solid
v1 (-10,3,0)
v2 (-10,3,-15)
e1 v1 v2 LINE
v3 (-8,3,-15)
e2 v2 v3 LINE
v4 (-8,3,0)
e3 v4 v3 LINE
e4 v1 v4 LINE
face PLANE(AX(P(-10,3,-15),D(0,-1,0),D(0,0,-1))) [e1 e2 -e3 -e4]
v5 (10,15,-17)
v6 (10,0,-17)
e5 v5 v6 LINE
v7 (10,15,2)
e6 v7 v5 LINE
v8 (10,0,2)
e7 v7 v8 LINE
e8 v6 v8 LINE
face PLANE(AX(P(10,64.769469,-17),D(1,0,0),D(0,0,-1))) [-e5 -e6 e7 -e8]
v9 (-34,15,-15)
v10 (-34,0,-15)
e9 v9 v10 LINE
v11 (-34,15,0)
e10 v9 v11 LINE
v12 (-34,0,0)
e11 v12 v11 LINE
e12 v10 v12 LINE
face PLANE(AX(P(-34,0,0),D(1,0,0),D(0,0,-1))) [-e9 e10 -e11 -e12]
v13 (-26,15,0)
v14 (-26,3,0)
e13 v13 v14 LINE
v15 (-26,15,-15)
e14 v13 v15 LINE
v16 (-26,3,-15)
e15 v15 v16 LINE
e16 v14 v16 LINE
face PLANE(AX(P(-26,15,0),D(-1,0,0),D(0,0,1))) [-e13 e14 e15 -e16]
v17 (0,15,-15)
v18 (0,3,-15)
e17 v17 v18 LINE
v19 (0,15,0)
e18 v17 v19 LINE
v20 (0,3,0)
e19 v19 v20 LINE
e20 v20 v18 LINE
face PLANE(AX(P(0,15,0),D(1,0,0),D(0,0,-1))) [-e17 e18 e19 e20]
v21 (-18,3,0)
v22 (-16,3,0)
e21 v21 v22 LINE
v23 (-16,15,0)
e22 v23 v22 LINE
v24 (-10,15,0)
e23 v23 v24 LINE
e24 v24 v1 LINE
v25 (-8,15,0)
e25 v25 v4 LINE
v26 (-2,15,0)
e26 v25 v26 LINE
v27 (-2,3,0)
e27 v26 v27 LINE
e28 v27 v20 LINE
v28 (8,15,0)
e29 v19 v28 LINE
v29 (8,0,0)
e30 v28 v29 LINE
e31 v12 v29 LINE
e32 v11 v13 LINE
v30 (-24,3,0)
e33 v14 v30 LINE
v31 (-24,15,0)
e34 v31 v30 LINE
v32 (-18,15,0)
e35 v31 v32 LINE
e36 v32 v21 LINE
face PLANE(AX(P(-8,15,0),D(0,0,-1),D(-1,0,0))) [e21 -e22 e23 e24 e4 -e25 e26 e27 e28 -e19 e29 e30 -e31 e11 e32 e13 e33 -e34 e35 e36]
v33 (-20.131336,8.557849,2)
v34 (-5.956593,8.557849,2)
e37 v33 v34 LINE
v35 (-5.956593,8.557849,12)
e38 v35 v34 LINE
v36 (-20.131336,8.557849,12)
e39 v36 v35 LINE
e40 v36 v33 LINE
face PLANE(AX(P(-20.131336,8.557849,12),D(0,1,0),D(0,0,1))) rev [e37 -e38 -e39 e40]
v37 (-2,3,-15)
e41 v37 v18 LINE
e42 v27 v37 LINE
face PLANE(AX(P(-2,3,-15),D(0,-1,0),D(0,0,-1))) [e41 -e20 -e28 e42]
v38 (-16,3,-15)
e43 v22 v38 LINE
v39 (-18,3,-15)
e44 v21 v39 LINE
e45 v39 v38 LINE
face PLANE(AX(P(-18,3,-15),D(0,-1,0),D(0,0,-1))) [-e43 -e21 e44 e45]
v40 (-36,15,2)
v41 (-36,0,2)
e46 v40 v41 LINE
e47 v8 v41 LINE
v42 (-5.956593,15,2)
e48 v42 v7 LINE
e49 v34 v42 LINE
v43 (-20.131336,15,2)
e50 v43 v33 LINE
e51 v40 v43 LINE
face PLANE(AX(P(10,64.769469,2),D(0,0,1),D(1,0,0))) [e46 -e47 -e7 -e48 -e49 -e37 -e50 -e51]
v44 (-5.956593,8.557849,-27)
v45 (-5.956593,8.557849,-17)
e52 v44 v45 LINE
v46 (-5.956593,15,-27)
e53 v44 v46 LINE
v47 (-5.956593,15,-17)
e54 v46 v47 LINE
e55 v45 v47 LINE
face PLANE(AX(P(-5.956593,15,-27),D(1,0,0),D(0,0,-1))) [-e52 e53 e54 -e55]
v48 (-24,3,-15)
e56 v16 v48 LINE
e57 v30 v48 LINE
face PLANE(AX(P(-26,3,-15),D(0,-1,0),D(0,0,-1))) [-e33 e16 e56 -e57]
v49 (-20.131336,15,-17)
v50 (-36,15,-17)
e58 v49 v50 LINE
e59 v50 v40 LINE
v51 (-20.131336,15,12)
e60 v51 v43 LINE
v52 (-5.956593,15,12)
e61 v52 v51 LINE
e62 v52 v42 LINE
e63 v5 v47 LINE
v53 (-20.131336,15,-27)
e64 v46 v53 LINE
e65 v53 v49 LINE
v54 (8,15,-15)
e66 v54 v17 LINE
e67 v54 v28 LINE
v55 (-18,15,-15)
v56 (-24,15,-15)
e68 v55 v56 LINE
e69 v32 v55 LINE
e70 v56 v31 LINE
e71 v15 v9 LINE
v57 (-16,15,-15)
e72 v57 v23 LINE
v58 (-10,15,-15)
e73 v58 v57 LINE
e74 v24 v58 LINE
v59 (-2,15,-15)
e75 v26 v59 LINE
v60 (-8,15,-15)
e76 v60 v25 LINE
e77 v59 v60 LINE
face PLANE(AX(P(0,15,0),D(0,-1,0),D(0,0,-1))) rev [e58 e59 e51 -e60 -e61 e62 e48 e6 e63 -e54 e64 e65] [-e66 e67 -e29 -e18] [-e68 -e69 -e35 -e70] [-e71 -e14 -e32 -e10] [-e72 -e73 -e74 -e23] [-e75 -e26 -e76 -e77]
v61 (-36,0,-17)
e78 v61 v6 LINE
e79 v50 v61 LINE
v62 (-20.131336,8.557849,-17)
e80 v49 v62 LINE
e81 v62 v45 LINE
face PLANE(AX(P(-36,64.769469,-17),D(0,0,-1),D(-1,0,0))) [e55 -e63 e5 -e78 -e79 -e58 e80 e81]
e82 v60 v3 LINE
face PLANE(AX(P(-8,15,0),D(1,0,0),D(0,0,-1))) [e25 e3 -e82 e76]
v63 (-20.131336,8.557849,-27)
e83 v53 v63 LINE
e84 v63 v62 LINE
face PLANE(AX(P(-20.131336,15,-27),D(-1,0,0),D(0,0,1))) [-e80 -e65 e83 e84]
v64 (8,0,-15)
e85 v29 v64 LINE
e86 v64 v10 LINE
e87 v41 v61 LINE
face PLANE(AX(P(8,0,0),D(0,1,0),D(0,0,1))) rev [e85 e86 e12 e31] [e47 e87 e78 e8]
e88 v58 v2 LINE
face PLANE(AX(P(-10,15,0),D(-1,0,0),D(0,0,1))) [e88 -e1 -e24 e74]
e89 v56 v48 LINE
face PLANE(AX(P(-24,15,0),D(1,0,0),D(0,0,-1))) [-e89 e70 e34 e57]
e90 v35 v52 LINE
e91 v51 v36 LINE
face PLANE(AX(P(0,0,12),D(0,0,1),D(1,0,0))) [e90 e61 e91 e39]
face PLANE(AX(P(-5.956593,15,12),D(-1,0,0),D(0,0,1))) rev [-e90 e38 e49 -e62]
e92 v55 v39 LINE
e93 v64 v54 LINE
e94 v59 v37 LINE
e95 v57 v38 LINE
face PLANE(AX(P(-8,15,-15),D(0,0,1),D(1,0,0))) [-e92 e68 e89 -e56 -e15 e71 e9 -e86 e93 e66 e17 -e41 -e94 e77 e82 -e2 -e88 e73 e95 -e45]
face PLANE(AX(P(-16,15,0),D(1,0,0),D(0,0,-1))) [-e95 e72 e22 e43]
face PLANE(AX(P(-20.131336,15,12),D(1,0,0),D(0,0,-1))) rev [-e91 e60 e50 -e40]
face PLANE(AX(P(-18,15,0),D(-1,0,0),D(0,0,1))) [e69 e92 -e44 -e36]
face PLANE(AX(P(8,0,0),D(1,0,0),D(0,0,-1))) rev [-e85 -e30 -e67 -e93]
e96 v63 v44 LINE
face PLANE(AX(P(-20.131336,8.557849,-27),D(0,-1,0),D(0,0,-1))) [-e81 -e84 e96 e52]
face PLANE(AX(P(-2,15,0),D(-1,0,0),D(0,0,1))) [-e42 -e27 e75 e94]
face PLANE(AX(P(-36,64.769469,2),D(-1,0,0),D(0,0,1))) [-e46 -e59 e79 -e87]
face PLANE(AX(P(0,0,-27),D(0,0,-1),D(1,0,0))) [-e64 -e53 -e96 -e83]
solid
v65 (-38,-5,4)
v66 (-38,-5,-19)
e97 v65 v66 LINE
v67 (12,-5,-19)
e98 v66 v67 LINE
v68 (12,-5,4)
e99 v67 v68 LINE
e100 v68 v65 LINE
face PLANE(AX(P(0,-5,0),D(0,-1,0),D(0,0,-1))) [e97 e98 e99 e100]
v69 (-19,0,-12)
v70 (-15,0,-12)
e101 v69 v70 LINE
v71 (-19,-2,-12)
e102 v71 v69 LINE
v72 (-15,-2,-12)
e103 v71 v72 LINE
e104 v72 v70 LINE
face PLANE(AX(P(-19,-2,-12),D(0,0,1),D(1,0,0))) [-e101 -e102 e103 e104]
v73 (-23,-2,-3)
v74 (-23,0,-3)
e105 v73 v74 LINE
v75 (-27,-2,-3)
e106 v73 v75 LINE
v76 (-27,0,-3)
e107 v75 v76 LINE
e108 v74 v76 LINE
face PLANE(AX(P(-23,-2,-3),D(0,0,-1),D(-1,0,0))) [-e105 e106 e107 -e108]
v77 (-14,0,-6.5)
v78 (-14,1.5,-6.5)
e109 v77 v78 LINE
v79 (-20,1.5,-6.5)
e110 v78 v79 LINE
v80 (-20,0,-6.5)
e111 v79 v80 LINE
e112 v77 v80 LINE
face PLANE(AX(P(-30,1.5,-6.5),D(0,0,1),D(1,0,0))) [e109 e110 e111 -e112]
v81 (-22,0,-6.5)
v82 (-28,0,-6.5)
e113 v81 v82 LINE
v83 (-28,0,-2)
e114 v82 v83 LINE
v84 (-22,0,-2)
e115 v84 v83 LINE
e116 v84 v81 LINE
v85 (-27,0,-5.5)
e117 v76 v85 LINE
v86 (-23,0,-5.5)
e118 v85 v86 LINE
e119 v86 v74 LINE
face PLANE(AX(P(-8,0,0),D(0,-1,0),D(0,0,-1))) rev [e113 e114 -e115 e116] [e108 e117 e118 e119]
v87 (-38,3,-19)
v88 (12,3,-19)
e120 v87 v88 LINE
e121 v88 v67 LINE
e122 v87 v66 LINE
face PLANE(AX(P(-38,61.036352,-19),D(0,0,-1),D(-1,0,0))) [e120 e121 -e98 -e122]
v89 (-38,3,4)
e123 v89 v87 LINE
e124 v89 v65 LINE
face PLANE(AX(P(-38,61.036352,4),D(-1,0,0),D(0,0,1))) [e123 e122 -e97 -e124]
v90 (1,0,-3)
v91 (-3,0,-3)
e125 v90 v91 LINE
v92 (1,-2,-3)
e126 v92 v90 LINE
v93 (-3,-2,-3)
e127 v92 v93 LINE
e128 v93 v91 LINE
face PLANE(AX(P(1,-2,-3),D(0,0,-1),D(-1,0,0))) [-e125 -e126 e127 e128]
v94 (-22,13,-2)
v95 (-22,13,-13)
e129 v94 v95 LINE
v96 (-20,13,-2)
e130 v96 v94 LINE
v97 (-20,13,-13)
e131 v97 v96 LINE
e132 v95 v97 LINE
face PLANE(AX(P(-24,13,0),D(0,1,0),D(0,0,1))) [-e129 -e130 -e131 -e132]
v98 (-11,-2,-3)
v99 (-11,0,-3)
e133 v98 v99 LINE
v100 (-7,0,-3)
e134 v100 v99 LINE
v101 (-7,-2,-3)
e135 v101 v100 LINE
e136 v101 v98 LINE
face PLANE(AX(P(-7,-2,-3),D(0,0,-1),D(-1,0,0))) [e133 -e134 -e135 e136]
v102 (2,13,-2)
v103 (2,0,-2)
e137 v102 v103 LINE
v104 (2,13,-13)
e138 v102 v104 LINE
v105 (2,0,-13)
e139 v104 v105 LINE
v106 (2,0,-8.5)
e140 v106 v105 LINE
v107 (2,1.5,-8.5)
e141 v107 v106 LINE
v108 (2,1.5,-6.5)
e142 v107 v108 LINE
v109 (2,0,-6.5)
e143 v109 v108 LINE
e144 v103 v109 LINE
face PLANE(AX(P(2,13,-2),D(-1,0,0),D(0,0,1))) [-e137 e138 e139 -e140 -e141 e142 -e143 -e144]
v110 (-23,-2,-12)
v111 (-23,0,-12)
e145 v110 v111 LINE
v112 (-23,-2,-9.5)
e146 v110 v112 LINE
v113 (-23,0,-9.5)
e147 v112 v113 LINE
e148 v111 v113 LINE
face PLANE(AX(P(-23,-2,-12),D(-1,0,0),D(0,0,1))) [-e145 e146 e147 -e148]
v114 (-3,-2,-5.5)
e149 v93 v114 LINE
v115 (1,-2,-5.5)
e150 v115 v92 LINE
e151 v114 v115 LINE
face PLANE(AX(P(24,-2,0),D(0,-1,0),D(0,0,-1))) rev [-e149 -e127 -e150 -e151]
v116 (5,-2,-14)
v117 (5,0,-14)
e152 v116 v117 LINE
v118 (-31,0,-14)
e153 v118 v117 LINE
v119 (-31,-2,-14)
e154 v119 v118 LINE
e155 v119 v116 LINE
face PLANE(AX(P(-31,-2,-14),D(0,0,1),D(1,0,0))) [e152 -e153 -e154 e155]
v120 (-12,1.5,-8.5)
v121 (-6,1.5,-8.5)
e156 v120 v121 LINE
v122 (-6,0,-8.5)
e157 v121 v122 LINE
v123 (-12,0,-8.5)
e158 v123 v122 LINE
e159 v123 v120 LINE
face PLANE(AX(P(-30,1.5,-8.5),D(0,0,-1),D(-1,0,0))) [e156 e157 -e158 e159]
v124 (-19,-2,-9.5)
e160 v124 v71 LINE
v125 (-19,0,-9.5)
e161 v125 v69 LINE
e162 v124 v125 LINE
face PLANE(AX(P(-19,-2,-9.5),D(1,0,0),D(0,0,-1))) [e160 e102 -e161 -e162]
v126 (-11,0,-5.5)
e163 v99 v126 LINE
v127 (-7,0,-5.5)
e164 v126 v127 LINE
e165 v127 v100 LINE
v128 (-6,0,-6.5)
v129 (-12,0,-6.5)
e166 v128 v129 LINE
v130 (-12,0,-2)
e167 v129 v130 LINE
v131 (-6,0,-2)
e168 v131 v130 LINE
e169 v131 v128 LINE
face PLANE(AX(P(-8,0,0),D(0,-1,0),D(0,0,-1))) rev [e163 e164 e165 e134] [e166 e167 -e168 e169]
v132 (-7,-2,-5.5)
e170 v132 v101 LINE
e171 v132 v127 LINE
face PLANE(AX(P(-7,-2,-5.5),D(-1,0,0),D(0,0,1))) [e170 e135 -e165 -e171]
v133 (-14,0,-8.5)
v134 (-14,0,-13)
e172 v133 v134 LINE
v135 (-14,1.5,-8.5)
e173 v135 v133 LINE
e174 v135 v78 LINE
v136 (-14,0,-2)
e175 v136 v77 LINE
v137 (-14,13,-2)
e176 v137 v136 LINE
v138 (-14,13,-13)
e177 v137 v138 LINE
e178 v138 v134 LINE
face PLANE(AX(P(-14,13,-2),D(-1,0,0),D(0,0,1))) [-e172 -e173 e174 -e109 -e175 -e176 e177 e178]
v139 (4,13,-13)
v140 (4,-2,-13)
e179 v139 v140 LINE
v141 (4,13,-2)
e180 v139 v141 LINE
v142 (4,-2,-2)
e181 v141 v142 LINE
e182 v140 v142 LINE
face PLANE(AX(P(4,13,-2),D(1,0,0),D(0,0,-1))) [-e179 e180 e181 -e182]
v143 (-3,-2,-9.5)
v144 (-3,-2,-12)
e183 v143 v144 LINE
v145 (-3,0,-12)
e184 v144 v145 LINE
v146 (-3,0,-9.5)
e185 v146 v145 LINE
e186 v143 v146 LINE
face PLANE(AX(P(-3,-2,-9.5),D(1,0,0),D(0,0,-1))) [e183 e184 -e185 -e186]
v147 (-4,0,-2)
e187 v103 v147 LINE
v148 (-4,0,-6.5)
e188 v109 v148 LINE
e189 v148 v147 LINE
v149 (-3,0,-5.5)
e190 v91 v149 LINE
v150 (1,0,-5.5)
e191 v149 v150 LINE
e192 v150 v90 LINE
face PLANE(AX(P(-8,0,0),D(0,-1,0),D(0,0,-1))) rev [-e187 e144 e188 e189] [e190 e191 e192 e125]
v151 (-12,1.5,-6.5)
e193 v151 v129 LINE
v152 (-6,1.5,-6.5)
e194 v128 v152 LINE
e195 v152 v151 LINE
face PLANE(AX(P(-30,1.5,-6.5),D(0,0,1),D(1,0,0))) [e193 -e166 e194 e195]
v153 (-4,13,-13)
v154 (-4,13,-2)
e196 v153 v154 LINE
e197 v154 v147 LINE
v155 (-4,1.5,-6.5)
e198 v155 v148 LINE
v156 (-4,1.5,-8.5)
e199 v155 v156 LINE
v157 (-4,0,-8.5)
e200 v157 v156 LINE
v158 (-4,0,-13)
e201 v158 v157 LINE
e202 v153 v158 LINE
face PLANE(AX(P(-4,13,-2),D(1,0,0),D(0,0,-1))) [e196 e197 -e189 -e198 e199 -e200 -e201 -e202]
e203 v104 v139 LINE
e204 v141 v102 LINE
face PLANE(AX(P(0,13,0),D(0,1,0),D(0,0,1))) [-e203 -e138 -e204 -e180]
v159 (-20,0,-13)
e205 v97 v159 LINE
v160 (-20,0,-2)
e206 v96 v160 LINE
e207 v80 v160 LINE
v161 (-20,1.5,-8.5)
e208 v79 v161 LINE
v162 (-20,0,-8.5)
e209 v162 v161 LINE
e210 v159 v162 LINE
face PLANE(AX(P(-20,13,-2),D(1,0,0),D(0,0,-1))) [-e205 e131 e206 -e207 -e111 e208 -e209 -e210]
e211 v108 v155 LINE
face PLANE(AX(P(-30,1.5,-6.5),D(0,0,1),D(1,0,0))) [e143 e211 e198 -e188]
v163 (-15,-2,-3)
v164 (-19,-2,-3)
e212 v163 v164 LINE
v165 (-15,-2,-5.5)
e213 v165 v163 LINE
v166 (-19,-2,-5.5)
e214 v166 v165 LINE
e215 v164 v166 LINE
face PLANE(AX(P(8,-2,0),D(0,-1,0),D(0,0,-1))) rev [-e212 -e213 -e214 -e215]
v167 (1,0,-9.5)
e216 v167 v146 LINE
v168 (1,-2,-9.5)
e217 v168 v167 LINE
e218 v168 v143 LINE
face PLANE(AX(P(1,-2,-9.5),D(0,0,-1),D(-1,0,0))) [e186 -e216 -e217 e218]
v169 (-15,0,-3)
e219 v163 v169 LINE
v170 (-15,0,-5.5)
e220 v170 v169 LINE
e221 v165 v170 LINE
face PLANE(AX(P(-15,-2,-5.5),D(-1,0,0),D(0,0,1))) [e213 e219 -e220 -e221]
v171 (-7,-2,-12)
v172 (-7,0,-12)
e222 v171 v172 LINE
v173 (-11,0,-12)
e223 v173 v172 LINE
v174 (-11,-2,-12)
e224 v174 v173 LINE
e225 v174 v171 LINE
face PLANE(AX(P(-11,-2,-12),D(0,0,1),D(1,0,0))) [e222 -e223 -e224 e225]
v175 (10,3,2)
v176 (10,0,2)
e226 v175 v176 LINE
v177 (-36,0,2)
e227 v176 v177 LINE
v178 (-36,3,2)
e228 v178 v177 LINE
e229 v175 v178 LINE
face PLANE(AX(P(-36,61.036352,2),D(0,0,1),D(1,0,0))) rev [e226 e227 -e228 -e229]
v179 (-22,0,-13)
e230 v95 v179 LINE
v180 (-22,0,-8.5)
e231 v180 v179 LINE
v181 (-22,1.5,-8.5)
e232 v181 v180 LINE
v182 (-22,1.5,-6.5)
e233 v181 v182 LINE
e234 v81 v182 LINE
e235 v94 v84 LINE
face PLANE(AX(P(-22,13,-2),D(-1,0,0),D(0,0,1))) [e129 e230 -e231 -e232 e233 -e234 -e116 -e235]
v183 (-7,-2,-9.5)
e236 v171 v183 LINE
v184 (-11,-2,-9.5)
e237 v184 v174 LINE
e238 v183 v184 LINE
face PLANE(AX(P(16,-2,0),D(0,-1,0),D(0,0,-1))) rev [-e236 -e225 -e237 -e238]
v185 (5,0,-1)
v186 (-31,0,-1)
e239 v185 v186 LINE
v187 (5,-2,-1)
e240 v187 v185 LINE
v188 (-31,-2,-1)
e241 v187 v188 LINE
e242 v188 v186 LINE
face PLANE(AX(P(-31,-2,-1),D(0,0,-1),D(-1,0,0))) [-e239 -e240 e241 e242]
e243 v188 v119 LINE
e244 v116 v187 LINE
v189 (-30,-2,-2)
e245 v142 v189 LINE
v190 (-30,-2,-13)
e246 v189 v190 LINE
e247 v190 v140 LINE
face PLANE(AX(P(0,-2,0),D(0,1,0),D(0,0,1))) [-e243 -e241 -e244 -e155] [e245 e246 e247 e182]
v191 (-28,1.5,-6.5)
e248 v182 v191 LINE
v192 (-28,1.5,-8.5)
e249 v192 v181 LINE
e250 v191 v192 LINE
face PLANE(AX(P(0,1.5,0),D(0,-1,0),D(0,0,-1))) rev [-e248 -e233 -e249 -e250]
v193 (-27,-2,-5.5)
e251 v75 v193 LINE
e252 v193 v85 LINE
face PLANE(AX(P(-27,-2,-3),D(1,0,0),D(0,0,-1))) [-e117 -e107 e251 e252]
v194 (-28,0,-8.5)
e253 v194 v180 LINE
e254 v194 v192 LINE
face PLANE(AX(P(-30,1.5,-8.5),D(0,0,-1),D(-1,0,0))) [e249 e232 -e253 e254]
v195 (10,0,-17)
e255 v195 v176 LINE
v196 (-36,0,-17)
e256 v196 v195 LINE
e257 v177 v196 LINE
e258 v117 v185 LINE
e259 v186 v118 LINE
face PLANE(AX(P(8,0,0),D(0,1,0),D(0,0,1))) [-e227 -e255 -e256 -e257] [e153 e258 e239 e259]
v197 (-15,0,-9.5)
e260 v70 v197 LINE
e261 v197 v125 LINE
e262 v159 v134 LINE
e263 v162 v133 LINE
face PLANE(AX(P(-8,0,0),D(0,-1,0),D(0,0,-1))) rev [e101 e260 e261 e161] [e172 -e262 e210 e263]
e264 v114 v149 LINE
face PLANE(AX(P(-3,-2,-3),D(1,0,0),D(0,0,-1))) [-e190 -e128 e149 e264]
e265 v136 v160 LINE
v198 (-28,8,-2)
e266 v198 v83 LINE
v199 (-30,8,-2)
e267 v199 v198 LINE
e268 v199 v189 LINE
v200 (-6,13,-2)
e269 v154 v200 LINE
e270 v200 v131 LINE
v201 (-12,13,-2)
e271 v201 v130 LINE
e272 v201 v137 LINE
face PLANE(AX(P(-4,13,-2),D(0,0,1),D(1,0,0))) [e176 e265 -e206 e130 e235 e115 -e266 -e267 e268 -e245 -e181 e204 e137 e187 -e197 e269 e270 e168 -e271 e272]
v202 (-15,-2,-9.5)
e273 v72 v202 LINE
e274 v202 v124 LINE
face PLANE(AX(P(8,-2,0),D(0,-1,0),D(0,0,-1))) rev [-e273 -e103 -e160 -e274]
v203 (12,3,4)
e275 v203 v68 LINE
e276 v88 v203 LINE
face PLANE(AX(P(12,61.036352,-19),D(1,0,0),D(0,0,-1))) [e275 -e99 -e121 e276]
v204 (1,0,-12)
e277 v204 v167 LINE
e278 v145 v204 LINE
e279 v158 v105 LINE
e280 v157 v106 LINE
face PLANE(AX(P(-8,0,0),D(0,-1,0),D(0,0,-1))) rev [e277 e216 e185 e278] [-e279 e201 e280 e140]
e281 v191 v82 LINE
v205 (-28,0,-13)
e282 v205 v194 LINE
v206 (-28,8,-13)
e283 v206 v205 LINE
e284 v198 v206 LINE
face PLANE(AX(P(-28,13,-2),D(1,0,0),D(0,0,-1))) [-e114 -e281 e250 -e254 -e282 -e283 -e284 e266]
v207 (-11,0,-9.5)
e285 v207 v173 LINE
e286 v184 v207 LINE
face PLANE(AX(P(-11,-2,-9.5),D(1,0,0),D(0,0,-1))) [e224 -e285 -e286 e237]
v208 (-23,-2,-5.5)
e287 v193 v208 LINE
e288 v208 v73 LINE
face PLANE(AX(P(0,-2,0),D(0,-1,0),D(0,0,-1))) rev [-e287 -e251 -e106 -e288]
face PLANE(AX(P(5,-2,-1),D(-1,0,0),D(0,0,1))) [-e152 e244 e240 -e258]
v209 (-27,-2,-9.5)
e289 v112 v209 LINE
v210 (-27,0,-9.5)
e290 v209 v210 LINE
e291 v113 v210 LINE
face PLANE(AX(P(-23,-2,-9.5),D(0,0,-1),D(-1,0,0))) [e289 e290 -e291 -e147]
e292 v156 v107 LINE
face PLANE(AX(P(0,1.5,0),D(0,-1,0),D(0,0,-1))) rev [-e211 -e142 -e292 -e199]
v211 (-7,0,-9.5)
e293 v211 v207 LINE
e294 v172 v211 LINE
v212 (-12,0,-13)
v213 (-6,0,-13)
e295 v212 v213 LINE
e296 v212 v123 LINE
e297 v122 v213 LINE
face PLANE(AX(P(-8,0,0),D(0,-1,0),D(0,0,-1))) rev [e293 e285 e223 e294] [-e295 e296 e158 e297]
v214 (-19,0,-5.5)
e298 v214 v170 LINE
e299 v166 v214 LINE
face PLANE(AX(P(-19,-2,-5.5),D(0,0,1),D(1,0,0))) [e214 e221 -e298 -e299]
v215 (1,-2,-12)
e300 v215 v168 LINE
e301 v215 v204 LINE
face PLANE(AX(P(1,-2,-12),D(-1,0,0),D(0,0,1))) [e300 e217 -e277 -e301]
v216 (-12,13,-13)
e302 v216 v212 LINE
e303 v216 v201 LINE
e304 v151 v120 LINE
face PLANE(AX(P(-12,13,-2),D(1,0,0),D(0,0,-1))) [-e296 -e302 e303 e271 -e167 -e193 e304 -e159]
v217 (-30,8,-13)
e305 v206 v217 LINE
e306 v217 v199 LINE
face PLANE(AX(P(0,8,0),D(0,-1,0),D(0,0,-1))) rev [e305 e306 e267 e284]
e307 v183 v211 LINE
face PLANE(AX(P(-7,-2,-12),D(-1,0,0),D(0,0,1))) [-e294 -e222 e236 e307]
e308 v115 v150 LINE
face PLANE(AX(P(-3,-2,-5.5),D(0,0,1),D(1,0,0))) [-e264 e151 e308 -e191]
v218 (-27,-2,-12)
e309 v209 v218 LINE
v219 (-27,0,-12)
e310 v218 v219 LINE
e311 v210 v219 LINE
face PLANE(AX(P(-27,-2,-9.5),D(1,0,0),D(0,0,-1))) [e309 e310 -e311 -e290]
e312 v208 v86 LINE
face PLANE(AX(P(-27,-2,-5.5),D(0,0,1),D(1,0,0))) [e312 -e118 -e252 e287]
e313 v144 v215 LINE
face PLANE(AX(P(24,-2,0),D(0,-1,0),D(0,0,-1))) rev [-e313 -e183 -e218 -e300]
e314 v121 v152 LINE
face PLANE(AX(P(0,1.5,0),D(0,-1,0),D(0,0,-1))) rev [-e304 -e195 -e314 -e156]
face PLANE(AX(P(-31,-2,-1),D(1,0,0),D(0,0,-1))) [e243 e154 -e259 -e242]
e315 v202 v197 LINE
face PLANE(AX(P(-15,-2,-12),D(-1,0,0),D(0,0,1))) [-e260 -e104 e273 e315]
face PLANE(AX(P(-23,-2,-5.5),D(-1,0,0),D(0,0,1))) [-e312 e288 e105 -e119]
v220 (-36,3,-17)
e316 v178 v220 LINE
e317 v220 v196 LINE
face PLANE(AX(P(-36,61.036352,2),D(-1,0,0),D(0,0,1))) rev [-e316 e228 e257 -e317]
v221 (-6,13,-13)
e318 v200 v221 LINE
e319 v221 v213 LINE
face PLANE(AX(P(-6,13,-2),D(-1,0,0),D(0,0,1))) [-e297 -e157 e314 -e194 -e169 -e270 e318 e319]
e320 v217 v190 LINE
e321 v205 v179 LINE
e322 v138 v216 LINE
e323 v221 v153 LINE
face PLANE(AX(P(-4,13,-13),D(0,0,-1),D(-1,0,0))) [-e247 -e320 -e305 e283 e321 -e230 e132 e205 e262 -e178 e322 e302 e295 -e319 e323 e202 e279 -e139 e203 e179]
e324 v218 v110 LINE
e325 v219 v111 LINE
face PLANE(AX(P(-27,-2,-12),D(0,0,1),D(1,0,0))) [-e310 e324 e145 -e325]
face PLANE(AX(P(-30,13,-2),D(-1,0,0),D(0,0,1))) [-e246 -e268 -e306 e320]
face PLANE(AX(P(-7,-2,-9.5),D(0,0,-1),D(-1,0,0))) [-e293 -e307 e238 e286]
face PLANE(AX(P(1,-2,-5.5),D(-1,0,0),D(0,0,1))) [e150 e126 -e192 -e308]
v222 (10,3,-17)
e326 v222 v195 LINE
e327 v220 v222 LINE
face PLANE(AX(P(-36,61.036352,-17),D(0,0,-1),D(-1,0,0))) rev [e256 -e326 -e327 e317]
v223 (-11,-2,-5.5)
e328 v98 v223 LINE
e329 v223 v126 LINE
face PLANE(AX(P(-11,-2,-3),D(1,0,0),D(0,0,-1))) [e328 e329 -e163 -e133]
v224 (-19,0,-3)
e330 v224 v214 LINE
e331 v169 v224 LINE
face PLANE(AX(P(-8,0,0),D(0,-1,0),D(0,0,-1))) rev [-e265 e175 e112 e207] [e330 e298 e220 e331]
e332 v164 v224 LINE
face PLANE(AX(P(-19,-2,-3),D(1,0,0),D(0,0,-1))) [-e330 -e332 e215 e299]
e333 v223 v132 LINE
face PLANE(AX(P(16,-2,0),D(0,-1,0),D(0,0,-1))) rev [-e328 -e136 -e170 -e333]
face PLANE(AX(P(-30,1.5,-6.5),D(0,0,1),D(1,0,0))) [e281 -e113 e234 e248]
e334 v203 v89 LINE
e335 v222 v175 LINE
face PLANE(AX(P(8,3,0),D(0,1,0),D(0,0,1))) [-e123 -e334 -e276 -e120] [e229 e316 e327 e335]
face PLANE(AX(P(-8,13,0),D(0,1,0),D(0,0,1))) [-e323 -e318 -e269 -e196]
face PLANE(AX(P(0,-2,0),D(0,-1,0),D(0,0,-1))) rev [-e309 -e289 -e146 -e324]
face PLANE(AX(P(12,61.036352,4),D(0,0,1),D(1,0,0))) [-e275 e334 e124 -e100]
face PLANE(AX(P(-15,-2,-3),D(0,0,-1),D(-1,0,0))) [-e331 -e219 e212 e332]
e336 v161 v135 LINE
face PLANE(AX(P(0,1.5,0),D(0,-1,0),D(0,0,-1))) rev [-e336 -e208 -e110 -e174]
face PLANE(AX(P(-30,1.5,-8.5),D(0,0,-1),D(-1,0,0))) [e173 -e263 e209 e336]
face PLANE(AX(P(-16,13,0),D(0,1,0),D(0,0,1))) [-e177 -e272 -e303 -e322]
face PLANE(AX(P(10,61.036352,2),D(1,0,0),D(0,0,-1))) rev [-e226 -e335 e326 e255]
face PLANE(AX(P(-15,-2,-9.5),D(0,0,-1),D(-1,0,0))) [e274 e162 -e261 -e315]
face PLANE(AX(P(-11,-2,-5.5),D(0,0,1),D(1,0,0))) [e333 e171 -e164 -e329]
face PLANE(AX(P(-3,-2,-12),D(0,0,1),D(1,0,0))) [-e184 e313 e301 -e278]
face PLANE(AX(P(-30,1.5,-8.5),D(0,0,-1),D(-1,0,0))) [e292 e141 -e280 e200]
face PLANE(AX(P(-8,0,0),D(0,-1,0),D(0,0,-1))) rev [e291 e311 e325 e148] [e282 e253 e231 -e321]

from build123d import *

# Parameters (mm, degrees)
SKETCH1_W                 = 6
SKETCH1_H                 = 15
BOSS_EXTRUDE1_DEPTH       = 15
SKETCH2_W                 = 2
SKETCH2_H                 = 11
CUT_EXTRUDE1_DEPTH        = 13
SKETCH3_W                 = 15
SKETCH3_H                 = 3
BOSS_EXTRUDE2_DEPTH       = 2
LPATTERN1_COUNT           = 5
LPATTERN1_PITCH           = 8
SKETCH6_W                 = 15
SKETCH6_H                 = 15
BOSS_EXTRUDE4_DEPTH       = 2
SKETCH8_W                 = 15
SKETCH8_H                 = 12
BOSS_EXTRUDE5_DEPTH       = 2
SKETCH9_W                 = 34
SKETCH9_H                 = 2
CUT_EXTRUDE2_DEPTH        = 1.5
SKETCH13_W                = 36
SKETCH13_H                = 13
SKETCH13_W_2              = 34
SKETCH13_H_2              = 11
BOSS_EXTRUDE9_DEPTH       = 2
SKETCH15_W                = 4
SKETCH15_H                = 2.5
BOSS_EXTRUDE10_DEPTH      = 2
LPATTERN2_COUNT           = 4
LPATTERN2_PITCH           = 8
BOSS_EXTRUDE11_DEPTH      = 5
BOSS_EXTRUDE11_DEPTH_BACK = 15
SKETCH17_W                = 46
SKETCH17_H                = 19
SPLIT2_START              = -5
SPLIT2_OUTLINE_W          = 46
SPLIT2_OUTLINE_H          = 19
SPLIT2_DEPTH              = 5
SPLIT2_2_OUTLINE_W        = 2
SPLIT2_2_OUTLINE_H        = 11
SPLIT2_2_DEPTH            = 13
SPLIT2_3_OUTLINE_W        = 6
SPLIT2_3_OUTLINE_H        = 2
SPLIT2_3_DEPTH            = 1.5
SPLIT2_START_2            = -13
SPLIT2_4_DEPTH            = 11
SPLIT2_START_3            = -17
SPLIT2_5_DEPTH            = 19
SPLIT2_6_OUTLINE_W        = 36
SPLIT2_6_OUTLINE_H        = 2
SPLIT2_6_DEPTH            = 3
SPLIT2_START_4            = -1
SPLIT2_7_OUTLINE_W        = 36
SPLIT2_7_OUTLINE_H        = 2
SPLIT2_7_DEPTH            = 3
SPLIT2_START_5            = -8.5
SPLIT2_8_DEPTH            = 2
SPLIT2_START_6            = -9.5
SPLIT2_9_OUTLINE_W        = 4
SPLIT2_9_OUTLINE_H        = 2
SPLIT2_9_DEPTH            = 4
SPLIT2_10_OUTLINE_W       = 4
SPLIT2_10_OUTLINE_H       = 2
SPLIT2_10_DEPTH           = 1
SPLIT2_START_7            = -3
SPLIT2_11_OUTLINE_W       = 4
SPLIT2_11_OUTLINE_H       = 2
SPLIT2_11_DEPTH           = 1
SKETCH18_W                = 14.174743238
SKETCH18_H                = 6.442150942
BOSS_EXTRUDE12_DEPTH      = 10
SKETCH19_W                = 50
SKETCH19_H                = 23
SKETCH19_W_2              = 46
SKETCH19_H_2              = 19
BOSS_EXTRUDE13_DEPTH      = 8
SKETCH20_W                = 2
SKETCH20_H                = 11
CUT_EXTRUDE3_DEPTH        = 5


# Read off the part's stored shape, not the designer's step: Split2
with BuildPart() as part:
    # Sketch1 → Boss-Extrude1 (new body)
    with BuildSketch(Plane(origin=(0, 0, 0), x_dir=(1, 0, 0), z_dir=(0, 1, 0))):
        with Locations((3, 7.5)):
            Rectangle(SKETCH1_W, SKETCH1_H)
    extrude(amount=BOSS_EXTRUDE1_DEPTH)

    # Sketch2 → Cut-Extrude1 (cut)
    with BuildSketch(Plane.XZ):
        with Locations((3, -7.5)):
            Rectangle(SKETCH2_W, SKETCH2_H)
    extrude(amount=-CUT_EXTRUDE1_DEPTH, mode=Mode.SUBTRACT)

    # Sketch3 → Boss-Extrude2 (add)
    with BuildSketch(Plane.ZY):
        with Locations((-7.5, 1.5)):
            Rectangle(SKETCH3_W, SKETCH3_H)
    extrude(amount=BOSS_EXTRUDE2_DEPTH)


with BuildPart() as lpattern1_1:
    # LPattern1: pattern copy
    add(part.part.moved(Location(Vector(-1, 0, 0) * (1 * LPATTERN1_PITCH))))


with BuildPart() as lpattern1_2:
    # LPattern1: pattern copy
    add(part.part.moved(Location(Vector(-1, 0, 0) * (2 * LPATTERN1_PITCH))))


with BuildPart() as lpattern1_3:
    # LPattern1: pattern copy
    add(part.part.moved(Location(Vector(-1, 0, 0) * (3 * LPATTERN1_PITCH))))


with BuildPart() as lpattern1_4:
    # LPattern1: pattern copy
    add(part.part.moved(Location(Vector(-1, 0, 0) * (4 * LPATTERN1_PITCH))))


with BuildPart() as lpattern1_1_1:
    add(lpattern1_1.part)

    # Combine1: union LPattern1_2, LPattern1_3, part, LPattern1_4
    add(lpattern1_2.part)
    add(lpattern1_3.part)
    add(part.part)
    add(lpattern1_4.part)

    # Sketch6 → Boss-Extrude4 (add)
    with BuildSketch(Plane(origin=(6, 0, 0), x_dir=(0, 0, -1), z_dir=(1, 0, 0))):
        with Locations((7.5, 7.5)):
            Rectangle(SKETCH6_W, SKETCH6_H)
    extrude(amount=BOSS_EXTRUDE4_DEPTH)

    # Sketch8 → Boss-Extrude5 (add)
    with BuildSketch(Plane.ZY.offset(32)):
        with Locations((-7.5, 9)):
            Rectangle(SKETCH8_W, SKETCH8_H)
    extrude(amount=BOSS_EXTRUDE5_DEPTH)

    # Sketch9 → Cut-Extrude2 (cut)
    with BuildSketch(Plane.XZ):
        with Locations((-13, -7.5)):
            Rectangle(SKETCH9_W, SKETCH9_H)
    extrude(amount=-CUT_EXTRUDE2_DEPTH, mode=Mode.SUBTRACT)

    # Sketch13 → Boss-Extrude9 (add)
    with BuildSketch(Plane(origin=(0, 0, 0), x_dir=(-1, 0, 0), z_dir=(0, -1, 0))):
        with Locations((13, 7.5)):
            Rectangle(SKETCH13_W, SKETCH13_H)
        with Locations((13, 7.5)):
            Rectangle(SKETCH13_W_2, SKETCH13_H_2, mode=Mode.SUBTRACT)
    extrude(amount=BOSS_EXTRUDE9_DEPTH)

    # Sketch15 → Boss-Extrude10 (add)
    with BuildSketch(Plane(origin=(0, 0, 0), x_dir=(-1, 0, 0), z_dir=(0, -1, 0))):
        with Locations((25, 4.25)):
            Rectangle(SKETCH15_W, SKETCH15_H)
        with Locations((25, 10.75)):
            Rectangle(SKETCH15_W, SKETCH15_H)
    boss_extrude10 = extrude(amount=BOSS_EXTRUDE10_DEPTH)

    # LPattern2: Boss-Extrude10 ×4
    with Locations(*[(i * LPATTERN2_PITCH, 0, 0) for i in range(1, LPATTERN2_COUNT)]):
        add(boss_extrude10)


with BuildPart() as body_2:
    # Sketch17 → Boss-Extrude11 (new, two sides: drawn at the far end of the back side and taken through both)
    with BuildSketch(Plane.XZ.offset(-BOSS_EXTRUDE11_DEPTH_BACK)):
        with Locations((-13, -7.5)):
            Rectangle(SKETCH17_W, SKETCH17_H)
    extrude(amount=BOSS_EXTRUDE11_DEPTH + BOSS_EXTRUDE11_DEPTH_BACK)

    # Combine3: cut LPattern1_1
    add(lpattern1_1_1.part, mode=Mode.SUBTRACT)

    # Split2 outline → Split2 (cut)
    with BuildSketch(Plane(origin=(0, 0, 0), x_dir=(1, 0, 0), z_dir=(0, 1, 0)).offset(SPLIT2_START)):
        with Locations((-13, 7.5)):
            Rectangle(SPLIT2_OUTLINE_W, SPLIT2_OUTLINE_H)
    extrude(amount=SPLIT2_DEPTH, mode=Mode.SUBTRACT)

    # Split2 2 outline → Split2 2 (cut)
    with BuildSketch(Plane(origin=(0, 0, 0), x_dir=(1, 0, 0), z_dir=(0, 1, 0))):
        with Locations((3, 7.5)):
            Rectangle(SPLIT2_2_OUTLINE_W, SPLIT2_2_OUTLINE_H)
        with Locations((-5, 7.5)):
            Rectangle(SPLIT2_2_OUTLINE_W, SPLIT2_2_OUTLINE_H)
        with Locations((-13, 7.5)):
            Rectangle(SPLIT2_2_OUTLINE_W, SPLIT2_2_OUTLINE_H)
        with Locations((-21, 7.5)):
            Rectangle(SPLIT2_2_OUTLINE_W, SPLIT2_2_OUTLINE_H)
        with Locations((-29, 7.5)):
            Rectangle(SPLIT2_2_OUTLINE_W, SPLIT2_2_OUTLINE_H)
    extrude(amount=SPLIT2_2_DEPTH, mode=Mode.SUBTRACT)

    # Split2 3 outline → Split2 3 (cut)
    with BuildSketch(Plane(origin=(0, 0, 0), x_dir=(1, 0, 0), z_dir=(0, 1, 0))):
        with Locations((-1, 7.5)):
            Rectangle(SPLIT2_3_OUTLINE_W, SPLIT2_3_OUTLINE_H)
        with Locations((-9, 7.5)):
            Rectangle(SPLIT2_3_OUTLINE_W, SPLIT2_3_OUTLINE_H)
        with Locations((-17, 7.5)):
            Rectangle(SPLIT2_3_OUTLINE_W, SPLIT2_3_OUTLINE_H)
        with Locations((-25, 7.5)):
            Rectangle(SPLIT2_3_OUTLINE_W, SPLIT2_3_OUTLINE_H)
    extrude(amount=SPLIT2_3_DEPTH, mode=Mode.SUBTRACT)

    # Sketch18 → Boss-Extrude12 (add)
    with BuildSketch(Plane.XY.offset(2)):
        with Locations((-13.043964225, 11.778924529)):
            Rectangle(SKETCH18_W, SKETCH18_H)
    boss_extrude12 = extrude(amount=BOSS_EXTRUDE12_DEPTH)

    # Mirror2: Boss-Extrude12 across plane
    add(boss_extrude12.mirror(Plane.XY.offset(-7.5)))


with BuildPart() as body_2_2:
    # Split2 4 outline → Split2 4 (new body)
    with BuildSketch(Plane.XY.offset(SPLIT2_START_2)):
        Polygon((-4, 0), (-4, 13), (-6, 13), (-6, 0), (-7, 0), (-7, -2), (-11, -2), (-11, 0), (-12, 0), (-12, 13), (-14, 13), (-14, 0), (-15, 0), (-15, -2), (-19, -2), (-19, 0), (-20, 0), (-20, 13), (-22, 13), (-22, 0), (-23, 0), (-23, -2), (-27, -2), (-27, 0), (-28, 0), (-28, 13), (-30, 13), (-30, -2), (-31, -2), (-31, 0), (-36, 0), (-36, -5), (10, -5), (10, 0), (5, 0), (5, -2), (4, -2), (4, 13), (2, 13), (2, 0), (1, 0), (1, -2), (-3, -2), (-3, 0), align=None)
    extrude(amount=SPLIT2_4_DEPTH)

    # Split2 5 outline → Split2 5 (add)
    with BuildSketch(Plane.XY.offset(SPLIT2_START_3)):
        Polygon((5, -2), (-31, -2), (-31, 0), (-36, 0), (-36, -5), (10, -5), (10, 0), (5, 0), align=None)
    extrude(amount=SPLIT2_5_DEPTH)

    # Split2 6 outline → Split2 6 (add)
    with BuildSketch(Plane.XY.offset(SPLIT2_START_3)):
        with Locations((-13, -1)):
            Rectangle(SPLIT2_6_OUTLINE_W, SPLIT2_6_OUTLINE_H)
    extrude(amount=SPLIT2_6_DEPTH)

    # Split2 7 outline → Split2 7 (add)
    with BuildSketch(Plane.XY.offset(SPLIT2_START_4)):
        with Locations((-13, -1)):
            Rectangle(SPLIT2_7_OUTLINE_W, SPLIT2_7_OUTLINE_H)
    extrude(amount=SPLIT2_7_DEPTH)

    # Split2 8 outline → Split2 8 (add)
    with BuildSketch(Plane.XY.offset(SPLIT2_START_5)):
        Polygon((2, 1.5), (-4, 1.5), (-4, 0), (-3, 0), (-3, -2), (1, -2), (1, 0), (2, 0), align=None)
        Polygon((-7, 0), (-6, 0), (-6, 1.5), (-12, 1.5), (-12, 0), (-11, 0), (-11, -2), (-7, -2), align=None)
        Polygon((-19, -2), (-15, -2), (-15, 0), (-14, 0), (-14, 1.5), (-20, 1.5), (-20, 0), (-19, 0), align=None)
        Polygon((-27, -2), (-23, -2), (-23, 0), (-22, 0), (-22, 1.5), (-28, 1.5), (-28, 0), (-27, 0), align=None)
    extrude(amount=SPLIT2_8_DEPTH)

    # Split2 9 outline → Split2 9 (add)
    with BuildSketch(Plane.XY.offset(SPLIT2_START_6)):
        with Locations((-1, -1)):
            Rectangle(SPLIT2_9_OUTLINE_W, SPLIT2_9_OUTLINE_H)
        with Locations((-9, -1)):
            Rectangle(SPLIT2_9_OUTLINE_W, SPLIT2_9_OUTLINE_H)
        with Locations((-17, -1)):
            Rectangle(SPLIT2_9_OUTLINE_W, SPLIT2_9_OUTLINE_H)
        with Locations((-25, -1)):
            Rectangle(SPLIT2_9_OUTLINE_W, SPLIT2_9_OUTLINE_H)
    extrude(amount=SPLIT2_9_DEPTH)

    # Split2 10 outline → Split2 10 (add)
    with BuildSketch(Plane.XY.offset(SPLIT2_START_2)):
        with Locations((-1, -1)):
            Rectangle(SPLIT2_10_OUTLINE_W, SPLIT2_10_OUTLINE_H)
        with Locations((-9, -1)):
            Rectangle(SPLIT2_10_OUTLINE_W, SPLIT2_10_OUTLINE_H)
        with Locations((-17, -1)):
            Rectangle(SPLIT2_10_OUTLINE_W, SPLIT2_10_OUTLINE_H)
        with Locations((-25, -1)):
            Rectangle(SPLIT2_10_OUTLINE_W, SPLIT2_10_OUTLINE_H)
    extrude(amount=SPLIT2_10_DEPTH)

    # Split2 11 outline → Split2 11 (add)
    with BuildSketch(Plane.XY.offset(SPLIT2_START_7)):
        with Locations((-1, -1)):
            Rectangle(SPLIT2_11_OUTLINE_W, SPLIT2_11_OUTLINE_H)
        with Locations((-9, -1)):
            Rectangle(SPLIT2_11_OUTLINE_W, SPLIT2_11_OUTLINE_H)
        with Locations((-17, -1)):
            Rectangle(SPLIT2_11_OUTLINE_W, SPLIT2_11_OUTLINE_H)
        with Locations((-25, -1)):
            Rectangle(SPLIT2_11_OUTLINE_W, SPLIT2_11_OUTLINE_H)
    extrude(amount=SPLIT2_11_DEPTH)

    # Sketch19 → Boss-Extrude13 (add)
    with BuildSketch(Plane.XZ.offset(5)):
        with Locations((-13, -7.5)):
            Rectangle(SKETCH19_W, SKETCH19_H)
        with Locations((-13, -7.5)):
            Rectangle(SKETCH19_W_2, SKETCH19_H_2, mode=Mode.SUBTRACT)
    extrude(amount=-BOSS_EXTRUDE13_DEPTH)

    # Sketch20 → Cut-Extrude3 (cut)
    with BuildSketch(Plane(origin=(0, 13, 0), x_dir=(1, 0, 0), z_dir=(0, 1, 0))):
        with Locations((-29, 7.5)):
            Rectangle(SKETCH20_W, SKETCH20_H)
    extrude(amount=-CUT_EXTRUDE3_DEPTH, mode=Mode.SUBTRACT)


solid = Compound([body_2.part, body_2_2.part])
